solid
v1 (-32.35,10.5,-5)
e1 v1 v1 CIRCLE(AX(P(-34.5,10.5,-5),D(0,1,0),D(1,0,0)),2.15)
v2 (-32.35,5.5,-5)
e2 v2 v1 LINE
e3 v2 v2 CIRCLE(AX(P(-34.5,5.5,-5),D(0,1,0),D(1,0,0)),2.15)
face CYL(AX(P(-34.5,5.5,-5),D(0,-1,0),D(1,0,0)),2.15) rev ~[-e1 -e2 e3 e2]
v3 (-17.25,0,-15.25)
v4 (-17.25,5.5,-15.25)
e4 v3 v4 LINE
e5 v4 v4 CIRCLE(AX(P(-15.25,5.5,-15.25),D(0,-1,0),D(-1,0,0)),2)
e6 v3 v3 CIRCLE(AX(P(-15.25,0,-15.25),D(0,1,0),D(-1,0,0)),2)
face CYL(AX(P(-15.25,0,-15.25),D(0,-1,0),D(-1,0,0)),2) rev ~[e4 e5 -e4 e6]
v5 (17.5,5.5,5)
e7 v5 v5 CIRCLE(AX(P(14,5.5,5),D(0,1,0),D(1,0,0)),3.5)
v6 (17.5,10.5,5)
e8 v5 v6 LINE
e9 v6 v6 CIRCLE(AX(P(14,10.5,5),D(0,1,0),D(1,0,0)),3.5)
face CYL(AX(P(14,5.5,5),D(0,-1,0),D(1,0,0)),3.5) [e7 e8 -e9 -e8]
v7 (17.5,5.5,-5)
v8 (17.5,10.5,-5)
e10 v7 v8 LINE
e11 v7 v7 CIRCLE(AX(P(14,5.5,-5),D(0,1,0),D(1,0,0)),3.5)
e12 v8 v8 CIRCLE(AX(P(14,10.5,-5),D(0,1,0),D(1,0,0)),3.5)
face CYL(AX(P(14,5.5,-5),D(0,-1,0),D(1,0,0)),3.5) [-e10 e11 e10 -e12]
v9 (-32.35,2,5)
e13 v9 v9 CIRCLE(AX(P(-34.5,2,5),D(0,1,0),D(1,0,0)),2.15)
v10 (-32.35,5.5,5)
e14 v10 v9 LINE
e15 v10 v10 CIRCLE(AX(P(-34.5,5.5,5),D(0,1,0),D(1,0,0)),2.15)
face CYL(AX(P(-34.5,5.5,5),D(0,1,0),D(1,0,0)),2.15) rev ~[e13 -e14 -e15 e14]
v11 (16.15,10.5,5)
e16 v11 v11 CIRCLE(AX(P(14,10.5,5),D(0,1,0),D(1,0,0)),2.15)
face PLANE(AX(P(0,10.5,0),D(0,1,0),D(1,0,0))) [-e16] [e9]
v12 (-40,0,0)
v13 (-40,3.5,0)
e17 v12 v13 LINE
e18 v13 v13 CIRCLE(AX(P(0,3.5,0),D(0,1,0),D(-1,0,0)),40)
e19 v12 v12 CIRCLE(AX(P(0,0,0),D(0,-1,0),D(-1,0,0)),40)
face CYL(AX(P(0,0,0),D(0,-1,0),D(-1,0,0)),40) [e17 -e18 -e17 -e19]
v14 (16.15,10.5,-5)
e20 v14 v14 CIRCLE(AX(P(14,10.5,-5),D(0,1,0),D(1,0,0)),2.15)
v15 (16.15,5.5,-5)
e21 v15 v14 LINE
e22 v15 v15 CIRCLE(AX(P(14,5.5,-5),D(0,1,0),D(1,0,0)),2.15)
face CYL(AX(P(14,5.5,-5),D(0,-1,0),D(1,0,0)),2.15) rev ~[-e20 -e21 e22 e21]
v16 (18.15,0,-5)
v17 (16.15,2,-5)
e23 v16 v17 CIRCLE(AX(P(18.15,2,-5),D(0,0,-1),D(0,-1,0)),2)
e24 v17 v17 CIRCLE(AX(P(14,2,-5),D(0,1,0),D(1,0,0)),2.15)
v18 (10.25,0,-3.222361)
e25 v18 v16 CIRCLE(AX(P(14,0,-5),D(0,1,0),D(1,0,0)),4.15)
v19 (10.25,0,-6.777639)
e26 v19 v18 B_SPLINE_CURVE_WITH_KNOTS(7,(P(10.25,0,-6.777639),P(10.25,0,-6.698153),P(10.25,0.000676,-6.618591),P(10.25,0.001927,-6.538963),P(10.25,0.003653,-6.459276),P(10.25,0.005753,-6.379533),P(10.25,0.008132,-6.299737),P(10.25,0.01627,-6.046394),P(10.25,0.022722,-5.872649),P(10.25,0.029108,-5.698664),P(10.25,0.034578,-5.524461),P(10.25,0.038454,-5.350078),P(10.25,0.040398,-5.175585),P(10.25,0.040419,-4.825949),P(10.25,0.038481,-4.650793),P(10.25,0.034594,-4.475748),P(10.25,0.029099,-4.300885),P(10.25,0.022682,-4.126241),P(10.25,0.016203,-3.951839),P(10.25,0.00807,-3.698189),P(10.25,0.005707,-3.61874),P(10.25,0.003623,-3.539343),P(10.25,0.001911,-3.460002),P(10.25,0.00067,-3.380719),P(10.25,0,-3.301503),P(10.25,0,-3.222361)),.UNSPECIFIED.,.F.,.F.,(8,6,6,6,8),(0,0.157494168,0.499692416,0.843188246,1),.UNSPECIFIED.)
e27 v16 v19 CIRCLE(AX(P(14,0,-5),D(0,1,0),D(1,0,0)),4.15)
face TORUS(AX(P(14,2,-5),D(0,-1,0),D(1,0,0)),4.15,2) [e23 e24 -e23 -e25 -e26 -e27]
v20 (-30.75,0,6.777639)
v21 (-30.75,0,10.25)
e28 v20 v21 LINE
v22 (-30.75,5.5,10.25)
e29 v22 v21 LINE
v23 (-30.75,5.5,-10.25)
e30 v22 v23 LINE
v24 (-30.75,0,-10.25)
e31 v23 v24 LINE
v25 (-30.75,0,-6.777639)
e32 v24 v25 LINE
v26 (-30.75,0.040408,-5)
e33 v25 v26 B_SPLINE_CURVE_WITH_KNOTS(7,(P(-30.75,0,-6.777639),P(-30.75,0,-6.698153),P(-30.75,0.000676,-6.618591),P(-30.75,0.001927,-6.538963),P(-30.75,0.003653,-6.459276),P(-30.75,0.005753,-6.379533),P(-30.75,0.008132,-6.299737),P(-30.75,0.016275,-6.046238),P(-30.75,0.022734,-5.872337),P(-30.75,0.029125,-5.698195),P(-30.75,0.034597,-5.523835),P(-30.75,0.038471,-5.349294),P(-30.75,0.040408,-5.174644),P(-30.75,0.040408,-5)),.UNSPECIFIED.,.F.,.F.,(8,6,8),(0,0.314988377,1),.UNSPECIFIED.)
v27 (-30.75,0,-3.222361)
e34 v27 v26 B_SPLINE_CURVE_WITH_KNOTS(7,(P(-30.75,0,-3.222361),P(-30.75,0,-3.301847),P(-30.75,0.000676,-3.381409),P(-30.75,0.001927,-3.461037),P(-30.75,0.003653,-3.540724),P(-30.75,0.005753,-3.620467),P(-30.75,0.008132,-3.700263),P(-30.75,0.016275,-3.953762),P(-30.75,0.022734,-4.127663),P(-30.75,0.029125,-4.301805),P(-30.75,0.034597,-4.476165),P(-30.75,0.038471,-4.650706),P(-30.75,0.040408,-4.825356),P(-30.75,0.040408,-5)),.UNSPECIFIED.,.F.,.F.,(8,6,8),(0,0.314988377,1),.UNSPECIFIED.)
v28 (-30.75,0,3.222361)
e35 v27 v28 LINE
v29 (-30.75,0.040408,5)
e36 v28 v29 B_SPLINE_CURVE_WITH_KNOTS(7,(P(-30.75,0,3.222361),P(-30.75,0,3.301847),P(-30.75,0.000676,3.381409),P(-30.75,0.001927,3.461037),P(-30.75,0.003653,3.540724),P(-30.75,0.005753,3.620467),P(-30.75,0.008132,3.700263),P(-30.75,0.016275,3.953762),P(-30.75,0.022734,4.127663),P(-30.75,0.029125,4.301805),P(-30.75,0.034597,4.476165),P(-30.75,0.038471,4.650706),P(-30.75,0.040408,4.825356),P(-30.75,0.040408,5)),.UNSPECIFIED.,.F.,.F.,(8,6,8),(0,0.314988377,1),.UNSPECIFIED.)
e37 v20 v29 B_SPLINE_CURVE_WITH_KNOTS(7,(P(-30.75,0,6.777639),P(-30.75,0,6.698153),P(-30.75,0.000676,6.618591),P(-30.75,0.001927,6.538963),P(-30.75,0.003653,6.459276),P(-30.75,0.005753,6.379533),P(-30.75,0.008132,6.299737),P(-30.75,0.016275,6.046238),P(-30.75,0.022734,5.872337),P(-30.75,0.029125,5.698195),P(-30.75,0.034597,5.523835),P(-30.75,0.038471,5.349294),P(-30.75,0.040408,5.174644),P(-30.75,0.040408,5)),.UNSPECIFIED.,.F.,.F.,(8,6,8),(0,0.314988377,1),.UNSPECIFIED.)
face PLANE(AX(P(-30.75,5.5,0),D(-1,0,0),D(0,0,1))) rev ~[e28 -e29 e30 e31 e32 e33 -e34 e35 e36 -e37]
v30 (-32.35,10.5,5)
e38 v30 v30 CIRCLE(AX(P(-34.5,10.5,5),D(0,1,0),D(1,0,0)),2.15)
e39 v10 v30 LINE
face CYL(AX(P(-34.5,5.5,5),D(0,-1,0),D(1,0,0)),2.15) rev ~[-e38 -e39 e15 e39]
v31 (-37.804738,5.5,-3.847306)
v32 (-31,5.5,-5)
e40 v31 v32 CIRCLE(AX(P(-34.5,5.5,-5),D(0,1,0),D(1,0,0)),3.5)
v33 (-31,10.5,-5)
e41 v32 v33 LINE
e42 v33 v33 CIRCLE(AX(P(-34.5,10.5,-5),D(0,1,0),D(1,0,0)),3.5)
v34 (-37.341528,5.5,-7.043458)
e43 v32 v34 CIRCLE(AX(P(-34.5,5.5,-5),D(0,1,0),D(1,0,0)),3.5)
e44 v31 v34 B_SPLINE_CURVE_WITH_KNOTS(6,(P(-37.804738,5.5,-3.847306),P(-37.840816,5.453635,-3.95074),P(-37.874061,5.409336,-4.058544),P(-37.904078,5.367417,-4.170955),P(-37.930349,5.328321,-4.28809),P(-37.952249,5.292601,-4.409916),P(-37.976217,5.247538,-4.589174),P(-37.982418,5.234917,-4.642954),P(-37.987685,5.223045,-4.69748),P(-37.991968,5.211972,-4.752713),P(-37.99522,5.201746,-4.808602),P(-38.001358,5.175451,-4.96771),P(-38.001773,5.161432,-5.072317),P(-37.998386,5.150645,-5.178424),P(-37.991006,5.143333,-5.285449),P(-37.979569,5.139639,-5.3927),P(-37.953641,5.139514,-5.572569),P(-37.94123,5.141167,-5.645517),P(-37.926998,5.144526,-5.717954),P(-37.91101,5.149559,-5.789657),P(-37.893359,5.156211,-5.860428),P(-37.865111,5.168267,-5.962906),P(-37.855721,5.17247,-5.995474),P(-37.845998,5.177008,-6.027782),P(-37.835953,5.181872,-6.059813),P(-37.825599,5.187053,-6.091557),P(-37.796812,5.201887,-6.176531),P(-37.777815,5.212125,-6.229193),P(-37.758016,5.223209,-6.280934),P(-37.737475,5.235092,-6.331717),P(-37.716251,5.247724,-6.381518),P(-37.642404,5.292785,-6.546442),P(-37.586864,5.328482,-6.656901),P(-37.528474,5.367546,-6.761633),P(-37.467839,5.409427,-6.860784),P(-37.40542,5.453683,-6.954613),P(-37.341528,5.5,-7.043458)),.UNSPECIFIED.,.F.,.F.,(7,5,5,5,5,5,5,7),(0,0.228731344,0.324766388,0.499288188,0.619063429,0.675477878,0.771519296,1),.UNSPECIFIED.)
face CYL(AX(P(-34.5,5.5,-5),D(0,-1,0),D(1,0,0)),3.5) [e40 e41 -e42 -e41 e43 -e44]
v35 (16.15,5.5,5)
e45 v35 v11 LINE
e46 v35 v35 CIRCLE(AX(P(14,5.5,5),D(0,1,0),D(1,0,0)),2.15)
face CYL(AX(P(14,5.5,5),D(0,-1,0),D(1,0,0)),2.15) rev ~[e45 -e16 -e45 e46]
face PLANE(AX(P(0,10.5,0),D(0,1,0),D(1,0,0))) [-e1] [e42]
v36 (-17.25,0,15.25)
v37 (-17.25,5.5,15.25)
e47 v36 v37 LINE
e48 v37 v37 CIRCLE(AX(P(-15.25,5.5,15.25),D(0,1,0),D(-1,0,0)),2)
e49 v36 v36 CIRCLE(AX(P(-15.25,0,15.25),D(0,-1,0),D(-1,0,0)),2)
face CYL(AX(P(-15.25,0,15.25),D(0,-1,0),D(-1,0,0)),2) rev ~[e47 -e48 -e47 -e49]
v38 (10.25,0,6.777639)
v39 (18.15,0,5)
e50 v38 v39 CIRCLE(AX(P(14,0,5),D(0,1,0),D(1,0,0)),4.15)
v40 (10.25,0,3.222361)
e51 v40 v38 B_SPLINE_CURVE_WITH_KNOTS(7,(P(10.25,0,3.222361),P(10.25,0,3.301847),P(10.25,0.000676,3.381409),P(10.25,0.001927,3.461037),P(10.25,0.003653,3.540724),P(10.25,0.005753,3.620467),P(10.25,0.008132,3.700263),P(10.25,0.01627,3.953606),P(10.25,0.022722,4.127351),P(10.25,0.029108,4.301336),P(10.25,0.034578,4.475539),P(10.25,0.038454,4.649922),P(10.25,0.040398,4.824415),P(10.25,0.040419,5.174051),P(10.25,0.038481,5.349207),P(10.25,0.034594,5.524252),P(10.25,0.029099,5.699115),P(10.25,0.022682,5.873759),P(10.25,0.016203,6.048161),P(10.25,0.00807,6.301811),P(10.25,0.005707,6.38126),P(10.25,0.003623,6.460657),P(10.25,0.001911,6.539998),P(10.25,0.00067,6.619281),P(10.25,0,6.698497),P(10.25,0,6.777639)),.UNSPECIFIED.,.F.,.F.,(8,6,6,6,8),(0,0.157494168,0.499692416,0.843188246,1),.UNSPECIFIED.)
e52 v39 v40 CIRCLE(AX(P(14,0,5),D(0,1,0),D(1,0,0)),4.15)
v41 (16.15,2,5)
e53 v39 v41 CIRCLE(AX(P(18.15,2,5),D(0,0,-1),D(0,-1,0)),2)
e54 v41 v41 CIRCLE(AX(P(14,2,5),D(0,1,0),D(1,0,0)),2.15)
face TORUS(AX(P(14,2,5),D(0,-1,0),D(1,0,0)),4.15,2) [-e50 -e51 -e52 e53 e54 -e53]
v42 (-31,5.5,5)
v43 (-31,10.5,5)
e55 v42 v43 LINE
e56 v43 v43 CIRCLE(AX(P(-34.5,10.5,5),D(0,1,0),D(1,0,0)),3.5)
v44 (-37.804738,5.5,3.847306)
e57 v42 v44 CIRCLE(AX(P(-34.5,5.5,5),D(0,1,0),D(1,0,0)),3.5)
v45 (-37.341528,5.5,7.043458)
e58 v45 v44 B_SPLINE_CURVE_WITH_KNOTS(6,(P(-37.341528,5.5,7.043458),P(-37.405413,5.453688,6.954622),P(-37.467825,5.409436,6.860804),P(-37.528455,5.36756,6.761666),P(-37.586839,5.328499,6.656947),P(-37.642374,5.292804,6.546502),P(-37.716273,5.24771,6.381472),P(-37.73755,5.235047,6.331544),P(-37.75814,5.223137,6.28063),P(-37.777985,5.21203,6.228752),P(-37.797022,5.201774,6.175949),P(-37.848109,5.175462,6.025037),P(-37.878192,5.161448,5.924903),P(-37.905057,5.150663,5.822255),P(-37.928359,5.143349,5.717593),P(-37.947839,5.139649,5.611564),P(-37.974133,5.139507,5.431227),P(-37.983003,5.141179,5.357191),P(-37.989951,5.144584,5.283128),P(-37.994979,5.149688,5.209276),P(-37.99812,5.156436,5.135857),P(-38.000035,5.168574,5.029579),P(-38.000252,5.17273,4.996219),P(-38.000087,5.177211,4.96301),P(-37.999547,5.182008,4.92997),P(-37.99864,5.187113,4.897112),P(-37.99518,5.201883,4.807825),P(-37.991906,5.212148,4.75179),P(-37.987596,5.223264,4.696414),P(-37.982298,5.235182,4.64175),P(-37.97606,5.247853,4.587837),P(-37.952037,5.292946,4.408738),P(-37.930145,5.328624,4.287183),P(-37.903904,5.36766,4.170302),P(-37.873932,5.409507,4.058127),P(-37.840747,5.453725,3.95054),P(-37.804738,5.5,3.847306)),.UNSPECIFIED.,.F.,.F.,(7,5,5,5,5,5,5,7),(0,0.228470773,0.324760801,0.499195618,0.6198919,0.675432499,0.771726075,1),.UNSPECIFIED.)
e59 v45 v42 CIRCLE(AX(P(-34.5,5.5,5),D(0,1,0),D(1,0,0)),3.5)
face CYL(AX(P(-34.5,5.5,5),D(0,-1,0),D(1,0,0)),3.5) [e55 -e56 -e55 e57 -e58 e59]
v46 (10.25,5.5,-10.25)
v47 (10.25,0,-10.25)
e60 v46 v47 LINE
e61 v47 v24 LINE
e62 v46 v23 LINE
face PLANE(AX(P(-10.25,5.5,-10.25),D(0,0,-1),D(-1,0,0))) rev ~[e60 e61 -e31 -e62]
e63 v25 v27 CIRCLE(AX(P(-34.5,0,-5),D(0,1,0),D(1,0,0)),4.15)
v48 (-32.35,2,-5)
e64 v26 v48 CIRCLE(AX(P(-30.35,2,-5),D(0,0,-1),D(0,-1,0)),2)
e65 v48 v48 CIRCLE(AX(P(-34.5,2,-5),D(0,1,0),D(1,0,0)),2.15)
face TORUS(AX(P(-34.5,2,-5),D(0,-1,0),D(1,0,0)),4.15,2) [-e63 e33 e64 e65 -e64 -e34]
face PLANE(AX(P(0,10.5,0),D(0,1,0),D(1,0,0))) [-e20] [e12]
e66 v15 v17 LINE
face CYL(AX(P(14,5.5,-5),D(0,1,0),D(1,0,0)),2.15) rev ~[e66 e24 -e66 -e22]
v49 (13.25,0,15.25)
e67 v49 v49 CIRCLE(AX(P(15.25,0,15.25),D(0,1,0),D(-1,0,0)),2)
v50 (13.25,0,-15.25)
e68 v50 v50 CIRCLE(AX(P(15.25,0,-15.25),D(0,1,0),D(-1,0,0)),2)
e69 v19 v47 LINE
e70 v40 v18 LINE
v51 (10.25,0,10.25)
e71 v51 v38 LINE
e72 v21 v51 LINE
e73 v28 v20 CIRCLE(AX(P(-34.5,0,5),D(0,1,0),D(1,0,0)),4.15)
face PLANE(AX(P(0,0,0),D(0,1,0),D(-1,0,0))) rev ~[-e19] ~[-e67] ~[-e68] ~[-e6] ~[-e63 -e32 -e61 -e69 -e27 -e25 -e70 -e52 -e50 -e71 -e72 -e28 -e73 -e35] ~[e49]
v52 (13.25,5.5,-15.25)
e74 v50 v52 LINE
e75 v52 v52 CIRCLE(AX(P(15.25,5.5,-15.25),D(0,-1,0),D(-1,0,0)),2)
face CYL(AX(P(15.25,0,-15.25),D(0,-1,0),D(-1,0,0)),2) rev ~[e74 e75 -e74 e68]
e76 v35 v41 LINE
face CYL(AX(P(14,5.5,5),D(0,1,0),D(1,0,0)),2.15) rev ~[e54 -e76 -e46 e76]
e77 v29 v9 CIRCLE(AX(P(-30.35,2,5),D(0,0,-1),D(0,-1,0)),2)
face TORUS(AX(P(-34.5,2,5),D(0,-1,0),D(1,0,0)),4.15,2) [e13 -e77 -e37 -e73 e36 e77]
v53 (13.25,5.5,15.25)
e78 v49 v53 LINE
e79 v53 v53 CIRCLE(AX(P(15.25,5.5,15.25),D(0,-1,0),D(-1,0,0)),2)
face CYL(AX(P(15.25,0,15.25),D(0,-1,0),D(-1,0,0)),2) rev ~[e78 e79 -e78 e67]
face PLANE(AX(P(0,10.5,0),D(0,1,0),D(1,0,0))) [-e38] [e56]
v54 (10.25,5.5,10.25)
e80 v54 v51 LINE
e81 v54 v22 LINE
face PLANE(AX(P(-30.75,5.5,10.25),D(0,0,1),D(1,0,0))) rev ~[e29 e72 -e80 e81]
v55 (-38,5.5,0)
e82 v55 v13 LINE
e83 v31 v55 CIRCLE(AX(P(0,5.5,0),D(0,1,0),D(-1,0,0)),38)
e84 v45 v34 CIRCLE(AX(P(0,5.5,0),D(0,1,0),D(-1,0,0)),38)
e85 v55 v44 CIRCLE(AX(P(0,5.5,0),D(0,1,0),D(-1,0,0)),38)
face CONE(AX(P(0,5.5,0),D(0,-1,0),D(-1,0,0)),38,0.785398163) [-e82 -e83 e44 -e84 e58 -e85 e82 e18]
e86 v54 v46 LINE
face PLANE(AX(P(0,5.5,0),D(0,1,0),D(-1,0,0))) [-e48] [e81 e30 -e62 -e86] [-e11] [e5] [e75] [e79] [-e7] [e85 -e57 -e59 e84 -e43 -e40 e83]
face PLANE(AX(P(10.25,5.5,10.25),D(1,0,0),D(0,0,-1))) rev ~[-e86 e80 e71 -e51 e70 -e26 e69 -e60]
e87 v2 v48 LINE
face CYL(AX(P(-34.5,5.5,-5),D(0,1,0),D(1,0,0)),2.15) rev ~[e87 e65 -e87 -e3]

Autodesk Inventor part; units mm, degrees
ref_plane "YZ Plane" through (0, 0, 0) normal (1, 0, 0) x (0, 1, 0)
ref_plane "XZ Plane" through (0, 0, 0) normal (0, 1, 0) x (-1, 0, 0)
ref_plane "XY Plane" through (0, 0, 0) normal (0, 0, 1) x (1, 0, 0)
sketch "Skizze1" plane through (0, 0, 0) normal (0, 1, 0) x (-1, 0, 0)
  circle A0 centre (0, 0) radius 40
  line L0 (15.25, 15.25) -> (-15.25, 15.25)
  line L1 (-15.25, 15.25) -> (-15.25, -15.25)
  line L2 (-15.25, -15.25) -> (15.25, -15.25)
  line L3 (15.25, -15.25) -> (15.25, 15.25)
  line L4 (0, -56) -> (0, 56) projected
  line L5 (56, 0) -> (-56, 0) projected
  circle A1 centre (15.25, 15.25) radius 2
  circle A2 centre (15.25, -15.25) radius 2
  circle A3 centre (-15.25, -15.25) radius 2
  circle A4 centre (-15.25, 15.25) radius 2
  point P0 (0, -15.25)
  point P1 (15.25, 0)
  dimension "d0" = 30.5
  dimension "d1" = 4
  dimension "d2" = 80
extrude "Extrusion1" add sketch "Skizze1" along normal blind 5.5 contours L5 L3 A1 L0 L4 A0 | A0 L4 L2 A2 L3 L5 | L4 L0 A4 L1 L5 A0 | A0 L5 L1 A3 L2 L4 | L5 L4 L0 A1 L3 | L3 A2 L2 L4 L5 | L4 L5 L1 A4 L0 | L2 A3 L1 L5 L4
sketch "Skizze2" plane through (0, 5.5, 0) normal (0, 1, 0) x (1, 0, 0)
  line L0 (-11.75, -8.5) -> (11.75, -8.5)
  line L1 (11.75, -8.5) -> (11.75, 8.5)
  line L2 (11.75, 8.5) -> (-11.75, 8.5)
  line L3 (-11.75, 8.5) -> (-11.75, -8.5)
  line L4 (-56, 0) -> (56, 0) projected
  line L5 (0, 56) -> (0, -56) projected
  line L6 (-0.25, -8.5) -> (6.25, -8.5)
  line L7 (6.25, -8.5) -> (6.25, -5.2)
  line L8 (6.25, -5.2) -> (-0.25, -5.2)
  line L9 (-0.25, -5.2) -> (-0.25, -8.5)
  line L10 (-11.75, 8.5) -> (6.25, 8.5)
  line L11 (6.25, 8.5) -> (6.25, 5.2)
  line L12 (6.25, 5.2) -> (-11.75, 5.2)
  line L13 (-11.75, 5.2) -> (-11.75, 8.5)
  line L14 (-5.75, -8.5) -> (-5.75, 5.2) construction
  circle A0 centre (-5.75, -1.65) radius 1.75
  point P0 (0, 0)
  point P1 (-11.75, 0)
  point P2 (0, -8.5)
  point P3 (-11.75, 5.2)
  dimension "d5" = 23.5
  dimension "d6" = 17
  dimension "d7" = 12
  dimension "d8" = 5.5
  dimension "d9" = 3.3
  dimension "d10" = 3.3
  dimension "d11" = 5.5
  dimension "d12" = 3.5
  dimension "d17" = 6
extrude "Extrusion2" [suppressed]
extrude "Extrusion3" [suppressed]
fillet "Rundung1" [suppressed]
fillet "Rundung2" [suppressed]
sketch "Skizze3" plane through (0, 5.5, 0) normal (0, 1, 0) x (1, 0, 0)
  line L0 (-30.75, -10.25) -> (10.25, -10.25)
  line L1 (10.25, -10.25) -> (10.25, 10.25)
  line L2 (10.25, 10.25) -> (-30.75, 10.25)
  line L3 (-30.75, 10.25) -> (-30.75, -10.25)
  line L4 (0, -10.25) -> (0, 10.25)
  circle A0 centre (-34.5, -5) radius 2.15
  circle A1 centre (-34.5, 5) radius 2.15
  circle A2 centre (14, 5) radius 2.15
  circle A3 centre (14, -5) radius 2.15
  line L5 (-10.25, -10.25) -> (-10.25, 10.25)
  line L6 (-56, 0) -> (56, 0) projected
  point P0 (0, 0)
  point P1 (0, 0)
  point P2 (-30.75, 0)
  point P3 (-10.25, 0)
  point P4 (10.25, 0)
  dimension "d20" = 48.5
  dimension "d21" = 4.3
  dimension "d22" = 20.5
  dimension "d23" = 41
  dimension "d24" = 34.5
  dimension "d25" = 10
  dimension "d35" = 10.25
extrude "Extrusion4" cut sketch "Skizze3" against normal through all
fillet "Rundung3" radius 2 4 edges at (-36.65, 0, 5) (-36.65, 0, -5) (11.85, 0, 5) (11.85, 0, -5)
sketch "Skizze4" plane through (0, 5.5, 0) normal (0, 1, 0) x (1, 0, 0)
  circle A0 centre (14, -5) radius 2.15 projected
  circle A1 centre (14, 5) radius 2.15 projected
  circle A2 centre (-34.5, 5) radius 2.15 projected
  circle A3 centre (-34.5, -5) radius 2.15 projected
  circle A4 centre (-34.5, -5) radius 3.5
  circle A5 centre (-34.5, 5) radius 3.5
  circle A6 centre (14, 5) radius 3.5
  circle A7 centre (14, -5) radius 3.5
  point P0 (0, 0)
  dimension "d29" = 7
extrude "Extrusion5" add sketch "Skizze4" along normal blind 5
chamfer "Fase1" distance 2 angle 45 1 edges at (40, 5.5, 0)
equation "\"d8\" = d11"
equation "\"d9\" = d10"
properties part number "_3D-Druck"
